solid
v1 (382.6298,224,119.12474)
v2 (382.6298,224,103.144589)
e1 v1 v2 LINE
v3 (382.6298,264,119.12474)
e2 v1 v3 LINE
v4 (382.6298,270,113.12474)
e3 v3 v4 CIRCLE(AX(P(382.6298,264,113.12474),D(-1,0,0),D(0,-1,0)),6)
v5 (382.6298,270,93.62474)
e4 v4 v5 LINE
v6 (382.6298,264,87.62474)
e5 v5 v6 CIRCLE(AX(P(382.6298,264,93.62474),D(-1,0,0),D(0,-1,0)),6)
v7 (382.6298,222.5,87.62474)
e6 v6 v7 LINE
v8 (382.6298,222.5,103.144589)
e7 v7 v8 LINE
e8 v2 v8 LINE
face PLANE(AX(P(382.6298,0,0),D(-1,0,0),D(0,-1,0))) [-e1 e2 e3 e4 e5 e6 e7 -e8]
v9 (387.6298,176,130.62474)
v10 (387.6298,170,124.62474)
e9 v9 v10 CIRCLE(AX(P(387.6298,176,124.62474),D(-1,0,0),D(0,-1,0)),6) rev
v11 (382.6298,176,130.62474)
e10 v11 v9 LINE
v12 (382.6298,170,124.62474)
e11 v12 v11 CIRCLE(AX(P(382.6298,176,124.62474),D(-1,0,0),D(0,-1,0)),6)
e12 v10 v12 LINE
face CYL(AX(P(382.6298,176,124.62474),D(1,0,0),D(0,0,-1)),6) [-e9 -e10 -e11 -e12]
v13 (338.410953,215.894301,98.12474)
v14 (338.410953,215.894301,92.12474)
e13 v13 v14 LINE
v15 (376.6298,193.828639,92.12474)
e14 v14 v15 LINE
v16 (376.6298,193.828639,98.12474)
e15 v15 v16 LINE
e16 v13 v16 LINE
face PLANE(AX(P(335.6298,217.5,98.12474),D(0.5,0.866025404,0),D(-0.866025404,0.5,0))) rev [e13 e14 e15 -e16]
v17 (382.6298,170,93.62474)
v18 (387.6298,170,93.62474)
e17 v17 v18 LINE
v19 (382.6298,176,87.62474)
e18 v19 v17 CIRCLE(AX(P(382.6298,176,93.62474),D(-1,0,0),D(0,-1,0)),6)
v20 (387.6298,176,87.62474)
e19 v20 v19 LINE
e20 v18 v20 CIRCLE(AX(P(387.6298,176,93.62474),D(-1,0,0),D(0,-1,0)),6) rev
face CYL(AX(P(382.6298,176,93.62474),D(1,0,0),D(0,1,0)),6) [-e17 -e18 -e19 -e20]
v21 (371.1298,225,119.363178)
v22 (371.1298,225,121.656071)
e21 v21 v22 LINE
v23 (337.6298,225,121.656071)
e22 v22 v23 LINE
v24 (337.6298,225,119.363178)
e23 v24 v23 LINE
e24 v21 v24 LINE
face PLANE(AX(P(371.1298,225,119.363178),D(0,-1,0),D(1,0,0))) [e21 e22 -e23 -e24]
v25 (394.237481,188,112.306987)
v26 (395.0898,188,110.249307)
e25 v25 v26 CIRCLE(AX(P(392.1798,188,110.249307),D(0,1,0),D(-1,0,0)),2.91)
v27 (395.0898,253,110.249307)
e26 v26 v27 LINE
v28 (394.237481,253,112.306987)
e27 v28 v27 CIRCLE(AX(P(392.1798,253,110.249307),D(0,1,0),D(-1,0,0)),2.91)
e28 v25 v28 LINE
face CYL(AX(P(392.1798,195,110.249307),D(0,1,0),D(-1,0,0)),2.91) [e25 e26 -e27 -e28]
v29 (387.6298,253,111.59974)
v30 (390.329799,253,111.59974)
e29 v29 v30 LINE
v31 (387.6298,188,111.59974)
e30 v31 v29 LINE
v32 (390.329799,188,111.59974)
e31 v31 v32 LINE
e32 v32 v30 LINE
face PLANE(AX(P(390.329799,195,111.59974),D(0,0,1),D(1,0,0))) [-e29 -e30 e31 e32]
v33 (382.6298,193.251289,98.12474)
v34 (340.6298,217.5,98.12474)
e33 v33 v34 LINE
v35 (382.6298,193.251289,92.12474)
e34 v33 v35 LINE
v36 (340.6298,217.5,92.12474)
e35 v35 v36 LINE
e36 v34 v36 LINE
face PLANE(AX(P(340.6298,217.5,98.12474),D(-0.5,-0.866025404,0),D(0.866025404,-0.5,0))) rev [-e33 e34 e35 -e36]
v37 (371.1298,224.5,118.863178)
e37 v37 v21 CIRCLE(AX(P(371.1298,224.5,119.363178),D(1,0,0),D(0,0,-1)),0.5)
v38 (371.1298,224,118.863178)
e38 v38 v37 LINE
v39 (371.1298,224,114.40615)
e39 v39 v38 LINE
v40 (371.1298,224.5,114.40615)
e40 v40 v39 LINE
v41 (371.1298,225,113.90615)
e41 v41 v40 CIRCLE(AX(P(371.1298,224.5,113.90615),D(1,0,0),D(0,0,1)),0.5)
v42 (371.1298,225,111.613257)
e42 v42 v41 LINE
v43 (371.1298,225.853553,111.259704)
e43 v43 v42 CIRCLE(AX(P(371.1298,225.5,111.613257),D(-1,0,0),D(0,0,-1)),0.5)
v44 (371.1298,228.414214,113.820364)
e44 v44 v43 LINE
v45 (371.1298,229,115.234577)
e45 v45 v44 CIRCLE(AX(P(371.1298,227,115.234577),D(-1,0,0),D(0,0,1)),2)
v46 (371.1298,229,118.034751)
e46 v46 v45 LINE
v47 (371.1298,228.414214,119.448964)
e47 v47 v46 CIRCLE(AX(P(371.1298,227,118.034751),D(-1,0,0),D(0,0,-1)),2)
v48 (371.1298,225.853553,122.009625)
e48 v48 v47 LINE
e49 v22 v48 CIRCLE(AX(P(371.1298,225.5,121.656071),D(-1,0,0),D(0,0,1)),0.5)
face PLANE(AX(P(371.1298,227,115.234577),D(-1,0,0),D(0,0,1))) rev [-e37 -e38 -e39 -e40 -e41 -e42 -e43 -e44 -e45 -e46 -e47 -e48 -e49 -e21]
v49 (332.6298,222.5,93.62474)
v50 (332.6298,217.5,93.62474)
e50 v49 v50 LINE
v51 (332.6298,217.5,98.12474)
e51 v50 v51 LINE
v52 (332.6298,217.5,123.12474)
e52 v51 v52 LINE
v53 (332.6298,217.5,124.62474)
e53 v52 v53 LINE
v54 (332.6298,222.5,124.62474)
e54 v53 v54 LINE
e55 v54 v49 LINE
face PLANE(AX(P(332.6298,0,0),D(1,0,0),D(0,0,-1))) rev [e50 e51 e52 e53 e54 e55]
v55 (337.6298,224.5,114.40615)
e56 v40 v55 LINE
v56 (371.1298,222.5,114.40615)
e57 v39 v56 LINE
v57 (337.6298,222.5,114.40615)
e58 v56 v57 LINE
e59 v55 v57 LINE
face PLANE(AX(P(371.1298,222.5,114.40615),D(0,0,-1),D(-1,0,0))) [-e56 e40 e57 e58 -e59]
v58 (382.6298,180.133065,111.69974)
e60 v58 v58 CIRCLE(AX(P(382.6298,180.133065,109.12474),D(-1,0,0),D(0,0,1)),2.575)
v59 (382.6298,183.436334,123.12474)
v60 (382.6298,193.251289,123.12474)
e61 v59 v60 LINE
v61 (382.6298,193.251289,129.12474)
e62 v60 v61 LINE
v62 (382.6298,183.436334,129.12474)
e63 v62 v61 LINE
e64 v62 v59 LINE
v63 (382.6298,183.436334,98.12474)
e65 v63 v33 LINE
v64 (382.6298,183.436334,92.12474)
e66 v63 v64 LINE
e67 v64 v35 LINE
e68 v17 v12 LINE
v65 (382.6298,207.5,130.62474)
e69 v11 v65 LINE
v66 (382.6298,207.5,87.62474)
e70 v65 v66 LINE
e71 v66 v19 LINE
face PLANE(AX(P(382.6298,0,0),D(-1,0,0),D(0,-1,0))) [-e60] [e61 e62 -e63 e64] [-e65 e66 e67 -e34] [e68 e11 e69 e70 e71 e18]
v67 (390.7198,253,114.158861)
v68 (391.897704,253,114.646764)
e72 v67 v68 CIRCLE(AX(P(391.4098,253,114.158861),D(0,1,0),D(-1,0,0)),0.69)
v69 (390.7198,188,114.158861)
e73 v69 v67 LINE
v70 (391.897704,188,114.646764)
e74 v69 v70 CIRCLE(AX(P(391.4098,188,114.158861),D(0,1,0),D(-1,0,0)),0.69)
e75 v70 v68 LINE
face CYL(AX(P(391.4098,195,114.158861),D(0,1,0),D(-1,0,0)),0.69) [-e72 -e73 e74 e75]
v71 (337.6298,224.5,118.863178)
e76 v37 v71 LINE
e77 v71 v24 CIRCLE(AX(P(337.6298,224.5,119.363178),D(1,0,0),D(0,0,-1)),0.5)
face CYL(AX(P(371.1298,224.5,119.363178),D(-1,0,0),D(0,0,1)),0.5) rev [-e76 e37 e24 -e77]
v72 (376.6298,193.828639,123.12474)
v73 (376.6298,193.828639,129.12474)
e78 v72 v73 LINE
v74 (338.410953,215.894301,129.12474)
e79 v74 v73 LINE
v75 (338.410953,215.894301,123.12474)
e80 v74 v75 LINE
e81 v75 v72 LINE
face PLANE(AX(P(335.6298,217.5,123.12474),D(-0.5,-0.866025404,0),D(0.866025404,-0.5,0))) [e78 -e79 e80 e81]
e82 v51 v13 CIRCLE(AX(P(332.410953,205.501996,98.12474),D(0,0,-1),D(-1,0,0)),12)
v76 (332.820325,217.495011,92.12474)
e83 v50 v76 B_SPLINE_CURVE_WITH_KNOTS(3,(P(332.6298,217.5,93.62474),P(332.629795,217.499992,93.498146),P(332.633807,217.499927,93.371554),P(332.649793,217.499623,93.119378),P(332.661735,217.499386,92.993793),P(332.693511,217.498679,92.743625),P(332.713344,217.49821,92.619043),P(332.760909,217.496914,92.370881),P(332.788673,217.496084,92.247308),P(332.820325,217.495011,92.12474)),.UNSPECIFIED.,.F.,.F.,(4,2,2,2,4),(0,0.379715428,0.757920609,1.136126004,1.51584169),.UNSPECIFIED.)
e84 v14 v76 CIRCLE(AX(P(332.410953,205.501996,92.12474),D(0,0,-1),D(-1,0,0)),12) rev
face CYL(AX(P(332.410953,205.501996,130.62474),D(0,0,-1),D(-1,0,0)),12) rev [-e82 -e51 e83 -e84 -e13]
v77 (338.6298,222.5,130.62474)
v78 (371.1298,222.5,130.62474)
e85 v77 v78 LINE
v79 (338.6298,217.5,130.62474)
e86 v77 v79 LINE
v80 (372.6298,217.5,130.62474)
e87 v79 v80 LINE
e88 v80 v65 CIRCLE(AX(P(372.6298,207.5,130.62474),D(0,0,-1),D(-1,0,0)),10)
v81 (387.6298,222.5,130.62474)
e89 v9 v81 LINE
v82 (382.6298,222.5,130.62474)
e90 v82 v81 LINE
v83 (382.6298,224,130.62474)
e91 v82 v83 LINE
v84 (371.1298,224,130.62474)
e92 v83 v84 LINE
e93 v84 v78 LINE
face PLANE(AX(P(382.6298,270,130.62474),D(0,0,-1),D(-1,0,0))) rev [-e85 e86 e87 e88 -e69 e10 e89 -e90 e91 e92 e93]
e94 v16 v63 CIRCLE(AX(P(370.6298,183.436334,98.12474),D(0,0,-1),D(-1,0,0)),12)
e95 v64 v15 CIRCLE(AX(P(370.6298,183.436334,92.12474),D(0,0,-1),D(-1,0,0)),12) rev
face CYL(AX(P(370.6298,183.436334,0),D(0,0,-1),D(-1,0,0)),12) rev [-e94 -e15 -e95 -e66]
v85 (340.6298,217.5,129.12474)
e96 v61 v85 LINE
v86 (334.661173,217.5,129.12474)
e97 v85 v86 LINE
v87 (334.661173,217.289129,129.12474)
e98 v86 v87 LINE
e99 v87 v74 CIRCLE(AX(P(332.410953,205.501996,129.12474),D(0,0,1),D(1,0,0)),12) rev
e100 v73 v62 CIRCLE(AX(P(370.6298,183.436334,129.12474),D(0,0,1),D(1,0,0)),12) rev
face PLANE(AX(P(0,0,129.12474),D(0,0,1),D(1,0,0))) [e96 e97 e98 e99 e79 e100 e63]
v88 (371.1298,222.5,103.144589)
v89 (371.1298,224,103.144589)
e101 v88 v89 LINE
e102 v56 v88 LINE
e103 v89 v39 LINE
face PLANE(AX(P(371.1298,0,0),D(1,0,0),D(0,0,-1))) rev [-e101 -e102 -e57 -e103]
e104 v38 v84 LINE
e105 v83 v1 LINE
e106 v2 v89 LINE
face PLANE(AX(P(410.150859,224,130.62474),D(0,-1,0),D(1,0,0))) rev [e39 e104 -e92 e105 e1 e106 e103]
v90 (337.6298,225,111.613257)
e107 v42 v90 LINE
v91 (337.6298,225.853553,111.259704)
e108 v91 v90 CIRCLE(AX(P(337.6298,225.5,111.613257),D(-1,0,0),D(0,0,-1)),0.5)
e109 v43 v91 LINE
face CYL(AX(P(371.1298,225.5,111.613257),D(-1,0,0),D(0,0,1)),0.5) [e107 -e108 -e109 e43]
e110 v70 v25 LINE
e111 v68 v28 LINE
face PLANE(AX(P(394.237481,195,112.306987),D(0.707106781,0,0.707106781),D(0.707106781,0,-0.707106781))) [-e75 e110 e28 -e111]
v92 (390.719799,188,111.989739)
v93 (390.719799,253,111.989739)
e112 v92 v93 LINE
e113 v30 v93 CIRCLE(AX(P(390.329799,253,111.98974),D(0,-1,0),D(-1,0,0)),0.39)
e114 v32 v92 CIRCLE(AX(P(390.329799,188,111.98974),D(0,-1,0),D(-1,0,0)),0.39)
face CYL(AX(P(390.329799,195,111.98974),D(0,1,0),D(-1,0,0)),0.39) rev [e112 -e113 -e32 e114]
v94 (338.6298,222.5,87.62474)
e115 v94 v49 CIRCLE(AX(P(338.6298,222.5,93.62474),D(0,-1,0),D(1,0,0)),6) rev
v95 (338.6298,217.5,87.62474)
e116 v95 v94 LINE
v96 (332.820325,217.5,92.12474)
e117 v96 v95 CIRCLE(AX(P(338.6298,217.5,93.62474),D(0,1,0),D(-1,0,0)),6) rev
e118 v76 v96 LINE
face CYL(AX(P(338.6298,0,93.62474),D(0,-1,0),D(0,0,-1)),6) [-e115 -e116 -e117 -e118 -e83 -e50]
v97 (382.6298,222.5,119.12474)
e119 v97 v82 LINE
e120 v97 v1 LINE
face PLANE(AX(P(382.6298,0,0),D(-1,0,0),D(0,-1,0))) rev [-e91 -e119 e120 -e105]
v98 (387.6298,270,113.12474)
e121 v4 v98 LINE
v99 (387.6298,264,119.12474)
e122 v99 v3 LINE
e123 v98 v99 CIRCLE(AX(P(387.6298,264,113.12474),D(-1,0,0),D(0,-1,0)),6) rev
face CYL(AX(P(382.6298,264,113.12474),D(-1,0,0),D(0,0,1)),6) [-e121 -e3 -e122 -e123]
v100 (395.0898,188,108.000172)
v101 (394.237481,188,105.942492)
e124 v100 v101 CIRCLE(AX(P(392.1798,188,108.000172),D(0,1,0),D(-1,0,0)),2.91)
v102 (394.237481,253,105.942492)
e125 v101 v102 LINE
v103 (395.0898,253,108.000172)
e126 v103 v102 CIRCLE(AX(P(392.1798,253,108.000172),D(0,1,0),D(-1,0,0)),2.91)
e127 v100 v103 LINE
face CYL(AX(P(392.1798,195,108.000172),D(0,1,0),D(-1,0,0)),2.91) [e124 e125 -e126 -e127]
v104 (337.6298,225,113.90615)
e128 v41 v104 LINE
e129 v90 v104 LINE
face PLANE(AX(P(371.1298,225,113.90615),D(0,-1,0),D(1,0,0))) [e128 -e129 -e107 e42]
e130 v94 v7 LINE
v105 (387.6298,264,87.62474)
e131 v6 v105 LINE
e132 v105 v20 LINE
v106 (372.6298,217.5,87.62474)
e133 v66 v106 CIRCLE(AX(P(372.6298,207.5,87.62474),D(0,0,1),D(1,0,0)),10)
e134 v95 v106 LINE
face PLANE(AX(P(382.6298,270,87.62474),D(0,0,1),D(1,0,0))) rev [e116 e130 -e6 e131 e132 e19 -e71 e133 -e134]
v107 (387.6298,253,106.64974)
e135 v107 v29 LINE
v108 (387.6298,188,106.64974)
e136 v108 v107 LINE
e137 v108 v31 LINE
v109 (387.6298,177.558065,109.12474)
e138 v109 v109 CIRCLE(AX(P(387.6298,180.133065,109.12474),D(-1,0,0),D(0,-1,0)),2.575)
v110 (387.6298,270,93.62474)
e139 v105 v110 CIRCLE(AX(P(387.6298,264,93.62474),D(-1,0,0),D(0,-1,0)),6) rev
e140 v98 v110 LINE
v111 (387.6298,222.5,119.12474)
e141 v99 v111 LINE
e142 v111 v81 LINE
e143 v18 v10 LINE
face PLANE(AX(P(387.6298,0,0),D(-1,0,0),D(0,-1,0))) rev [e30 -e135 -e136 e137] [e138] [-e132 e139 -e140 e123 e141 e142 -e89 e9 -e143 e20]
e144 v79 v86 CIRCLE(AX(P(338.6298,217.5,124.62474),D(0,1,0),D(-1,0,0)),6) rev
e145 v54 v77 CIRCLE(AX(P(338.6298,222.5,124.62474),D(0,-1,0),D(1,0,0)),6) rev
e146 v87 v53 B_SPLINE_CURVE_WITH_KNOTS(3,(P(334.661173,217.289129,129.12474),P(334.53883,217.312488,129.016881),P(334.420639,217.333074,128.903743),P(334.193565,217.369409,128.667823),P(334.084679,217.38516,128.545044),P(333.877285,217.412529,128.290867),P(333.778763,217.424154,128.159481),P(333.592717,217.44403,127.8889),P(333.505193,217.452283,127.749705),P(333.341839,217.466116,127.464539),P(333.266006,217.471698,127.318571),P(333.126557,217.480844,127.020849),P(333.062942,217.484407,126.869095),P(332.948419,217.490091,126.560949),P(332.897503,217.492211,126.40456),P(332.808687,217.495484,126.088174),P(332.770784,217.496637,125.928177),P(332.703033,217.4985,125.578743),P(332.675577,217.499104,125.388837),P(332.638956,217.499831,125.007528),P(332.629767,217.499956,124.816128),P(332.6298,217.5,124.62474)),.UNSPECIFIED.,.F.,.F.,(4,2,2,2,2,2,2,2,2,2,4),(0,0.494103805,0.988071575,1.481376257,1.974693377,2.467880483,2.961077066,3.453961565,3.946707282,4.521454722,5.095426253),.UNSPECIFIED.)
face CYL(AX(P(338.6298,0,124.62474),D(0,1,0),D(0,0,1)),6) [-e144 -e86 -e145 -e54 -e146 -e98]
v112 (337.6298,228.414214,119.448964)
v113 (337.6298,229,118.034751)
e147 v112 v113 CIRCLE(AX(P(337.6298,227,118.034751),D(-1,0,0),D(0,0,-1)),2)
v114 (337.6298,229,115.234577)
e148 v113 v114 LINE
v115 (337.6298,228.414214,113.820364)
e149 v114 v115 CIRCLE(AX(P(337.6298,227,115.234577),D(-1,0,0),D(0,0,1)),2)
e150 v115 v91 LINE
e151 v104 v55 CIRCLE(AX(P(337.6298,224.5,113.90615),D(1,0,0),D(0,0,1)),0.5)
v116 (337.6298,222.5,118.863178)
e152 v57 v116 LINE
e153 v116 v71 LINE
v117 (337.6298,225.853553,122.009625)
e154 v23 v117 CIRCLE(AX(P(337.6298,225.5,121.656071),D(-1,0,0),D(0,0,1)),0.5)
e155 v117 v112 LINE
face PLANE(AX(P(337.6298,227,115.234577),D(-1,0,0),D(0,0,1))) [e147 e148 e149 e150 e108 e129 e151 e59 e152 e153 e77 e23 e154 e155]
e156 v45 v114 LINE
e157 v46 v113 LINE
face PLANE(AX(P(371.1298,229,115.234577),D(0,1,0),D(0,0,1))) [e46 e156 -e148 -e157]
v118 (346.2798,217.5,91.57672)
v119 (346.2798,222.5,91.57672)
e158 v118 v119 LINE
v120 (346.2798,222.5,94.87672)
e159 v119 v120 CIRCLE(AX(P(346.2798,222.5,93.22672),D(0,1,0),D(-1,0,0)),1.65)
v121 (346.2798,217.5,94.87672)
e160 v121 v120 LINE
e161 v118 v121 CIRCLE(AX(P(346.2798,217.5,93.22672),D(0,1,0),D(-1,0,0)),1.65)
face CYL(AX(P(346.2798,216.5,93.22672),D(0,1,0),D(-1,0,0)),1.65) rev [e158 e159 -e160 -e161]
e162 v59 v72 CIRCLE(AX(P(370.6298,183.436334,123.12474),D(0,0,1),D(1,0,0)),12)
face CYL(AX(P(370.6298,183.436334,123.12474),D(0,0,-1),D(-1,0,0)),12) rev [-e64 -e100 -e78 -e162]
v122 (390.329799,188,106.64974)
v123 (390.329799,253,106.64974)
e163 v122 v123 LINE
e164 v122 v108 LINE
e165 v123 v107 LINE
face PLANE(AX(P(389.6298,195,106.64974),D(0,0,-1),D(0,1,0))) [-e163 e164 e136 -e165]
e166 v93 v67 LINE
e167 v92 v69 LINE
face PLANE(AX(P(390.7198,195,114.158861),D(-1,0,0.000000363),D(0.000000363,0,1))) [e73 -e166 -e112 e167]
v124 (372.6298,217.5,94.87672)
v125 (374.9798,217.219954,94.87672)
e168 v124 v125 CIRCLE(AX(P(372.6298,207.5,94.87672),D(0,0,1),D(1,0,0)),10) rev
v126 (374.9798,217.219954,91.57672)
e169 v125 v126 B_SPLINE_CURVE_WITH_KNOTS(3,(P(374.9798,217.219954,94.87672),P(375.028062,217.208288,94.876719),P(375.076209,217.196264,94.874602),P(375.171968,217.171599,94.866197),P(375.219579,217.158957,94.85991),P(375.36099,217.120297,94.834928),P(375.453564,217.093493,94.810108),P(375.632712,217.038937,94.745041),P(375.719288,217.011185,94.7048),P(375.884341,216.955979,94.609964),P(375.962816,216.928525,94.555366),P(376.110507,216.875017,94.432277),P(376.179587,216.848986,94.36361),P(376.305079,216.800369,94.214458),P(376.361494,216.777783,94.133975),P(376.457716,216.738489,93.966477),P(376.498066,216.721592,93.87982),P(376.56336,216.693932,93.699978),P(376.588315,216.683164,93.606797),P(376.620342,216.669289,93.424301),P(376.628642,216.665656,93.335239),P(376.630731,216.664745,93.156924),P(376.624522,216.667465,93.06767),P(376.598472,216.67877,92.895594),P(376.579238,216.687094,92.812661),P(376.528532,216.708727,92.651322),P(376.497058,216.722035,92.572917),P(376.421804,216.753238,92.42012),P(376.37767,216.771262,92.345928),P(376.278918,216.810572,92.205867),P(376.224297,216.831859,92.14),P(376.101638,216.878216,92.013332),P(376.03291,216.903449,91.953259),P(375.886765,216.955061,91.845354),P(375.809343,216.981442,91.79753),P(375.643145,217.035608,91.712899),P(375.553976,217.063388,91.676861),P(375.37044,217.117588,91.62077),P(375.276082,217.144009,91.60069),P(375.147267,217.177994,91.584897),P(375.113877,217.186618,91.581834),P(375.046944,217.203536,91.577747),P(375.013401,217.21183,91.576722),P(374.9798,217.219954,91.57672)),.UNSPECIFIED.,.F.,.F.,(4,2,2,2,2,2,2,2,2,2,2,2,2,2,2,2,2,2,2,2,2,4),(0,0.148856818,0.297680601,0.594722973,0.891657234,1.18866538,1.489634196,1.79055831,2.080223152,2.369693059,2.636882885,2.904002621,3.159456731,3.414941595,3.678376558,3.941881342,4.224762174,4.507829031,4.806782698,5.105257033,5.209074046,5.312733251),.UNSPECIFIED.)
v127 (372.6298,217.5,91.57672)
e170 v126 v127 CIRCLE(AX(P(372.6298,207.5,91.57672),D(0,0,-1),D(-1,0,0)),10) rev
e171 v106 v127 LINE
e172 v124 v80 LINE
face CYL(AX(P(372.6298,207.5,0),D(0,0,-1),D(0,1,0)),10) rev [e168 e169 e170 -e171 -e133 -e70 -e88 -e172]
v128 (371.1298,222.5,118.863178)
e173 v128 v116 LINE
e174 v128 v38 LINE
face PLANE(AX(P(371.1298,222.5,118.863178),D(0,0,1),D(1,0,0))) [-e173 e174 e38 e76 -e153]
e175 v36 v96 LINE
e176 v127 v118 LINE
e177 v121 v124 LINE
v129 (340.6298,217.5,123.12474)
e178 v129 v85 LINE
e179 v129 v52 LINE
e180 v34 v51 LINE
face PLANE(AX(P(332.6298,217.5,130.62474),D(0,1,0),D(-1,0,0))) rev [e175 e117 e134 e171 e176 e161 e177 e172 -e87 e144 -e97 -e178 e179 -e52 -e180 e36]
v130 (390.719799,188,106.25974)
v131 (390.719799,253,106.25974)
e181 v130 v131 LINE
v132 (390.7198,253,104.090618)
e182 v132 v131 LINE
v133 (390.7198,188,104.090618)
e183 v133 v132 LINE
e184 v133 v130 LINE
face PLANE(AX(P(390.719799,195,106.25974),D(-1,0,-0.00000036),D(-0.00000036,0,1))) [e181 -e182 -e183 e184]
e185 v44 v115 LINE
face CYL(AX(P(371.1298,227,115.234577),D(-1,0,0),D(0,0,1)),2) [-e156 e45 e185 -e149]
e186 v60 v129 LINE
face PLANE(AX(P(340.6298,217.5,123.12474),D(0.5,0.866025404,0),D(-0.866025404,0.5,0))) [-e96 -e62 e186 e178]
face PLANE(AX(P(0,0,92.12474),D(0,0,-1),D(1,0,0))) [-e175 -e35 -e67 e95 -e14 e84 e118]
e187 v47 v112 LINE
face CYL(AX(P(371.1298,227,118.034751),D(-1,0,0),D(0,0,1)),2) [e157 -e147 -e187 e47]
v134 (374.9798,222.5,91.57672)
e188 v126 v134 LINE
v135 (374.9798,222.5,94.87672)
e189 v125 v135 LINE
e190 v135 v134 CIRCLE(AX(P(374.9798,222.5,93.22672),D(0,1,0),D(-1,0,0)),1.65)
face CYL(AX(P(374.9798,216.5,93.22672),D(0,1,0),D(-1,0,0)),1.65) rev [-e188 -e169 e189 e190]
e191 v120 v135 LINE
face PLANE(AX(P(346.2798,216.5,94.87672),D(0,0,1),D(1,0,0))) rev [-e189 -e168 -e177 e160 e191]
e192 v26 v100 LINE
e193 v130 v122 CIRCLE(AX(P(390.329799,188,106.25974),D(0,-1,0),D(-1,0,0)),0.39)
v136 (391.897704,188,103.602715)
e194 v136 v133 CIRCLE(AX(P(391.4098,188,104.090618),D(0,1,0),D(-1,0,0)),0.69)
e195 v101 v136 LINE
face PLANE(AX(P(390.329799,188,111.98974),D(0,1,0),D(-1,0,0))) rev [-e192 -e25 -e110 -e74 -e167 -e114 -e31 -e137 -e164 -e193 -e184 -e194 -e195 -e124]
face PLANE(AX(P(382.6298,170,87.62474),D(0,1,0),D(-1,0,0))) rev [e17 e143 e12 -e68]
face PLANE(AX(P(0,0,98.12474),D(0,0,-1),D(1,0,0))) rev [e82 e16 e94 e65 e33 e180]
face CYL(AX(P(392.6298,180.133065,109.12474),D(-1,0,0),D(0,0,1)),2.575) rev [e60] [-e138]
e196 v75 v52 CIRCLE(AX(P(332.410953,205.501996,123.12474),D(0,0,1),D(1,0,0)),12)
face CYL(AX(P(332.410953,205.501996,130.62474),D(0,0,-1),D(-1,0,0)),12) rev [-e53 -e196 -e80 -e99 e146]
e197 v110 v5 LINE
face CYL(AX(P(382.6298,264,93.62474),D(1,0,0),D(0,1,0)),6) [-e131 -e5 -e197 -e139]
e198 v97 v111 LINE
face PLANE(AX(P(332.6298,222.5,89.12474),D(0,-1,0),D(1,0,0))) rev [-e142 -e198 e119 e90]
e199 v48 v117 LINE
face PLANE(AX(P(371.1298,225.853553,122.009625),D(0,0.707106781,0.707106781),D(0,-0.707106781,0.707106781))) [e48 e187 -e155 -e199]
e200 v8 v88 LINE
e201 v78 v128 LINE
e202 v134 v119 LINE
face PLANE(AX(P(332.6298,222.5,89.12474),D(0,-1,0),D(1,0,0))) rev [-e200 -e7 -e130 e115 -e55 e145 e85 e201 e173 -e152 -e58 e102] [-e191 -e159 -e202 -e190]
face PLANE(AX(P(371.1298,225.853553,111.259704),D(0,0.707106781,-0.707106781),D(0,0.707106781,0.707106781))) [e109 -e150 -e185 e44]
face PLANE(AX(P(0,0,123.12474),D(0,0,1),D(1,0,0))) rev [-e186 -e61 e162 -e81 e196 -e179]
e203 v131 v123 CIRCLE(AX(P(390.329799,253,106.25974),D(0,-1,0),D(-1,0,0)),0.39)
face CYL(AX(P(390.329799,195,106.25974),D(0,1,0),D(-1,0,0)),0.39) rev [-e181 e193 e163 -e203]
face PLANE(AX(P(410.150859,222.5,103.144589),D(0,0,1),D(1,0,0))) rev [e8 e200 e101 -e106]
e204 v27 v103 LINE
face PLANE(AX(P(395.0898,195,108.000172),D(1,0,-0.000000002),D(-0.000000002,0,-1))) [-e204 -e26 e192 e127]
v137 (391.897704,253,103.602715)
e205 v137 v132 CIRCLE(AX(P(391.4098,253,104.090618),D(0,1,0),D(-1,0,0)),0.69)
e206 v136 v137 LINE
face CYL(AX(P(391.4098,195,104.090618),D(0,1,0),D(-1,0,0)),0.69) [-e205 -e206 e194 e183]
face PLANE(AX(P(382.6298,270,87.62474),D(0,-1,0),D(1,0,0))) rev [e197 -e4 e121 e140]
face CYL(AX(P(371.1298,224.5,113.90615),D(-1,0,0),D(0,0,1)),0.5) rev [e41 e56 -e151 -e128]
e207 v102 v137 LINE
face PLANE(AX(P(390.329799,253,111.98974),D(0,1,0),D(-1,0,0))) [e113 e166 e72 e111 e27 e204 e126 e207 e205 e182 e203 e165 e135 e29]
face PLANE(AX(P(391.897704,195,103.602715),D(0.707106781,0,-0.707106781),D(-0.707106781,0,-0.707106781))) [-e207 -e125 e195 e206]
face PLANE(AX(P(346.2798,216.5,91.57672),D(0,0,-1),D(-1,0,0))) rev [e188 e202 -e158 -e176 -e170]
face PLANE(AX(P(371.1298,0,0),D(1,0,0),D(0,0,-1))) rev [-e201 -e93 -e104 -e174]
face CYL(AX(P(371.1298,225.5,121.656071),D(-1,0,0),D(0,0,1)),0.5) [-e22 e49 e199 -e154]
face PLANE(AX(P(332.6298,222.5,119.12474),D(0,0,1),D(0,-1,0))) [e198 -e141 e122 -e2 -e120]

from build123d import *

# Parameters (mm, degrees)
BOSS_EXTRUDE5_DEPTH  = 50
SKETCH11_W           = 43
SKETCH11_H           = 100
BOSS_EXTRUDE6_DEPTH  = 5
BOSS_EXTRUDE8_DEPTH  = 55
SKETCH13_W           = 11.5
SKETCH13_H           = 47.5
CUT_EXTRUDE1_DEPTH   = 55
BOSS_EXTRUDE9_DEPTH  = 6
FILLET7_R            = 12
FILLET7_OF_MIRROR1_R = 12
FILLET8_R            = 6
BOSS_EXTRUDE10_START = 8
BOSS_EXTRUDE10_DEPTH = 8
FILLET12_R           = 10
BOSS_EXTRUDE11_DEPTH = 57
SKETCH16_R           = 2.575
CUT_EXTRUDE2_DEPTH   = 10
SKETCH17_W           = 27.480150942
SKETCH17_H           = 1.5
BOSS_EXTRUDE12_DEPTH = 11.5
BOSS_EXTRUDE15_START = -5
BOSS_EXTRUDE15_DEPTH = 33.5
CUT_EXTRUDE3_DEPTH   = 6


with BuildPart() as part:
    # Sketch9 → Boss-Extrude5 (new body)
    with BuildSketch(Plane(origin=(0, 245, 0), x_dir=(1, 0, 0), z_dir=(0, 1, 0))):
        with BuildLine():
            Line((389.629800237, -111.599739584), (387.629800237, -111.599739584))
            Line((387.629800237, -111.599739584), (387.629800237, -106.649739584))
            Line((387.629800237, -106.649739584), (389.629800237, -106.649739584))
            Line((389.629800237, -106.649739584), (390.329799474, -106.649739584))
            ThreePointArc((390.329799474, -106.649739584), (390.605571069, -106.535511279), (390.719799474, -106.259739725))
            Line((390.719799474, -106.259739725), (390.719800256, -104.090618139))
            ThreePointArc((390.719800256, -104.090618139), (391.145748802, -103.453141463), (391.897703935, -103.602714709))
            Line((391.897703935, -103.602714709), (394.237480965, -105.942491739))
            ThreePointArc((394.237480965, -105.942491739), (394.868289671, -106.886563682), (395.089800232, -108.000172467))
            Line((395.089800232, -108.000172467), (395.089800237, -110.249306685))
            ThreePointArc((395.089800237, -110.249306685), (394.868289678, -111.362915477), (394.23748097, -112.306987424))
            Line((394.23748097, -112.306987424), (391.897703941, -114.646764454))
            ThreePointArc((391.897703941, -114.646764454), (391.145748809, -114.7963377), (390.719800262, -114.158861025))
            Line((390.719800262, -114.158861025), (390.719799474, -111.989739443))
            ThreePointArc((390.719799474, -111.989739443), (390.605571069, -111.71396789), (390.329799474, -111.599739584))
            Line((390.329799474, -111.599739584), (389.629800237, -111.599739584))
        make_face()
    extrude(amount=-BOSS_EXTRUDE5_DEPTH)

    # Sketch11 → Boss-Extrude6 (add)
    with BuildSketch(Plane.ZY.offset(-387.629800242)):
        with Locations((109.124739584, 220)):
            Rectangle(SKETCH11_W, SKETCH11_H)
    extrude(amount=BOSS_EXTRUDE6_DEPTH)

    # Sketch12 → Boss-Extrude8 (add)
    with BuildSketch(Plane.ZY.offset(-387.629800242)):
        Polygon((130.624739584, 222.5), (89.124739584, 222.5), (87.624739584, 222.5), (87.624739584, 217.5), (89.124739584, 217.5), (130.624739584, 217.5), align=None)
    extrude(amount=BOSS_EXTRUDE8_DEPTH)

    # Sketch13 → Cut-Extrude1 (cut)
    with BuildSketch(Plane.ZY.offset(-387.629800242)):
        with Locations((124.874739584, 246.25)):
            Rectangle(SKETCH13_W, SKETCH13_H)
    extrude(amount=CUT_EXTRUDE1_DEPTH, mode=Mode.SUBTRACT)

    # Sketch15 → Boss-Extrude9 (add)
    with BuildSketch(Plane.XY.offset(129.124739584)):
        Polygon((335.629800242, 217.5), (382.629800242, 190.364537348), (382.629800242, 193.251288694), (340.629800242, 217.5), align=None)
    boss_extrude9 = extrude(amount=-BOSS_EXTRUDE9_DEPTH)

    # Fillet7
    # the kernel refuses this fillet: 12 mm, written as the material it adds along each edge
    with BuildSketch(Plane(origin=(335.629800242, 217.5, 129.124739584), x_dir=(-1, 0, 0), z_dir=(0, 0, -1))) as fillet7_piece_1:
        with BuildLine():
            CenterArc((3.218847051, -11.998004249), FILLET7_R, 91.044975628, 28.955024372)
            Line((-2.781152949, -1.605699404), (-2.901152949, -1.397853307))
            Line((-2.901152949, -1.397853307), (-0.12, 0.207846097))
            Line((-0.12, 0.207846097), (0, 0.24))
            ThreePointArc((0, 0.24), (1.5, 0.24), (2.995623059, 0.239960085))
            Line((2.995623059, 0.239960085), (3, 0))
        make_face()
    extrude(amount=6)
    with BuildSketch(Plane(origin=(382.629800242, 190.364537348, 129.124739584), x_dir=(0, -1, 0), z_dir=(0, 0, -1))) as fillet7_piece_2:
        with BuildLine():
            CenterArc((FILLET7_R * 0.57735026919, FILLET7_R), FILLET7_R, 210, 60)
            Line((-FILLET7_R * 0.288675134595, FILLET7_R * 0.5), (-FILLET7_R * 0.305995642671, FILLET7_R * 0.49))
            Line((-FILLET7_R * 0.305995642671, FILLET7_R * 0.49), (-FILLET7_R * 0.0115470053838, -FILLET7_R * 0.02))
            Line((-FILLET7_R * 0.0115470053838, -FILLET7_R * 0.02), (FILLET7_R * 0.57735026919, -FILLET7_R * 0.02))
            Line((FILLET7_R * 0.57735026919, -FILLET7_R * 0.02), (FILLET7_R * 0.57735026919, 0))
        make_face()
    extrude(amount=6)

    # Mirror1: Boss-Extrude9 across plane
    add(boss_extrude9.mirror(Plane.XY.offset(110.624739584)))

    # Fillet7 of Mirror1
    # the kernel refuses this fillet: 12 mm, written as the material it adds along each edge
    with BuildSketch(Plane(origin=(335.629800242, 217.5, 92.124739584), x_dir=(-1, 0, 0), z_dir=(0, 0, 1))) as fillet7_of_mirror1_piece_1:
        with BuildLine():
            CenterArc((3.218847051, 11.998004249), FILLET7_OF_MIRROR1_R, 240, 28.955024372)
            Line((-2.781152949, 1.605699404), (-2.901152949, 1.397853307))
            Line((-2.901152949, 1.397853307), (-0.12, -0.207846097))
            Line((-0.12, -0.207846097), (0, -0.24))
            ThreePointArc((0, -0.24), (1.5, -0.24), (2.995623059, -0.239960085))
            Line((2.995623059, -0.239960085), (3, 0))
        make_face()
    extrude(amount=6)
    with BuildSketch(Plane(origin=(382.629800242, 190.364537348, 92.124739584), x_dir=(0, -1, 0), z_dir=(0, 0, 1))) as fillet7_of_mirror1_piece_2:
        with BuildLine():
            CenterArc((FILLET7_OF_MIRROR1_R * 0.57735026919, -FILLET7_OF_MIRROR1_R), FILLET7_OF_MIRROR1_R, 90, 60)
            Line((-FILLET7_OF_MIRROR1_R * 0.288675134595, -FILLET7_OF_MIRROR1_R * 0.5), (-FILLET7_OF_MIRROR1_R * 0.305995642671, -FILLET7_OF_MIRROR1_R * 0.49))
            Line((-FILLET7_OF_MIRROR1_R * 0.305995642671, -FILLET7_OF_MIRROR1_R * 0.49), (-FILLET7_OF_MIRROR1_R * 0.0115470053838, FILLET7_OF_MIRROR1_R * 0.02))
            Line((-FILLET7_OF_MIRROR1_R * 0.0115470053838, FILLET7_OF_MIRROR1_R * 0.02), (FILLET7_OF_MIRROR1_R * 0.57735026919, FILLET7_OF_MIRROR1_R * 0.02))
            Line((FILLET7_OF_MIRROR1_R * 0.57735026919, FILLET7_OF_MIRROR1_R * 0.02), (FILLET7_OF_MIRROR1_R * 0.57735026919, 0))
        make_face()
    extrude(amount=6)

    # Fillet8
    # the kernel refuses this fillet: 6 mm, written as the material it takes off along each edge
    with BuildSketch(Plane(origin=(402.629800242, 270, 87.624739584), x_dir=(0, 0, 1), z_dir=(-1, 0, 0)), Plane(origin=(332.629800242, 237.5, 87.624739584), x_dir=(0, 0, 1), z_dir=(0, -1, 0)), Plane(origin=(402.629800242, 270, 119.124739584), x_dir=(0, -1, 0), z_dir=(-1, 0, 0))) as fillet8_piece_1:
        with BuildLine():
            CenterArc((FILLET8_R, -FILLET8_R), FILLET8_R, 90, 90)
            Line((0, -FILLET8_R), (0, 0))
            Line((0, 0), (FILLET8_R, 0))
        make_face()
    extrude(amount=35, mode=Mode.SUBTRACT)
    with BuildSketch(Plane(origin=(402.629800242, 170, 87.624739584), x_dir=(0, 0, 1), z_dir=(-1, 0, 0)), Plane(origin=(402.629800242, 170, 130.624739584), x_dir=(0, 1, 0), z_dir=(-1, 0, 0)), Plane(origin=(332.629800242, 202.5, 130.624739584), x_dir=(1, 0, 0), z_dir=(0, 1, 0))) as fillet8_piece_2:
        with BuildLine():
            CenterArc((FILLET8_R, FILLET8_R), FILLET8_R, 180, 90)
            Line((0, FILLET8_R), (0, 0))
            Line((0, 0), (FILLET8_R, 0))
        make_face()
    extrude(amount=35, mode=Mode.SUBTRACT)

    # Sketch9<2> → Boss-Extrude10 (add)
    with BuildSketch(Plane(origin=(0, 245, 0), x_dir=(1, 0, 0), z_dir=(0, 1, 0)).offset(BOSS_EXTRUDE10_START)):
        with BuildLine():
            Line((389.629800237, -111.599739584), (387.629800237, -111.599739584))
            Line((387.629800237, -111.599739584), (387.629800237, -106.649739584))
            Line((387.629800237, -106.649739584), (389.629800237, -106.649739584))
            Line((389.629800237, -106.649739584), (390.329799474, -106.649739584))
            ThreePointArc((390.329799474, -106.649739584), (390.605571069, -106.535511279), (390.719799474, -106.259739725))
            Line((390.719799474, -106.259739725), (390.719800256, -104.090618139))
            ThreePointArc((390.719800256, -104.090618139), (391.145748802, -103.453141463), (391.897703935, -103.602714709))
            Line((391.897703935, -103.602714709), (394.237480965, -105.942491739))
            ThreePointArc((394.237480965, -105.942491739), (394.868289671, -106.886563682), (395.089800232, -108.000172467))
            Line((395.089800232, -108.000172467), (395.089800237, -110.249306685))
            ThreePointArc((395.089800237, -110.249306685), (394.868289678, -111.362915477), (394.23748097, -112.306987424))
            Line((394.23748097, -112.306987424), (391.897703941, -114.646764454))
            ThreePointArc((391.897703941, -114.646764454), (391.145748809, -114.7963377), (390.719800262, -114.158861025))
            Line((390.719800262, -114.158861025), (390.719799474, -111.989739443))
            ThreePointArc((390.719799474, -111.989739443), (390.605571069, -111.71396789), (390.329799474, -111.599739584))
            Line((390.329799474, -111.599739584), (389.629800237, -111.599739584))
        make_face()
    extrude(amount=-BOSS_EXTRUDE10_DEPTH)

    # Fillet12
    fillet12_edges = [part.edges().sort_by_distance(p)[0] for p in [
        (382.629800242, 217.5, 109.124739584),
    ]]
    fillet(fillet12_edges, radius=FILLET12_R)

    # Sketch9<3> → Boss-Extrude11 (add)
    with BuildSketch(Plane(origin=(0, 245, 0), x_dir=(1, 0, 0), z_dir=(0, 1, 0))):
        with BuildLine():
            Line((389.629800237, -111.599739584), (387.629800237, -111.599739584))
            Line((387.629800237, -111.599739584), (387.629800237, -106.649739584))
            Line((387.629800237, -106.649739584), (389.629800237, -106.649739584))
            Line((389.629800237, -106.649739584), (390.329799474, -106.649739584))
            ThreePointArc((390.329799474, -106.649739584), (390.605571069, -106.535511279), (390.719799474, -106.259739725))
            Line((390.719799474, -106.259739725), (390.719800256, -104.090618139))
            ThreePointArc((390.719800256, -104.090618139), (391.145748802, -103.453141463), (391.897703935, -103.602714709))
            Line((391.897703935, -103.602714709), (394.237480965, -105.942491739))
            ThreePointArc((394.237480965, -105.942491739), (394.868289671, -106.886563682), (395.089800232, -108.000172467))
            Line((395.089800232, -108.000172467), (395.089800237, -110.249306685))
            ThreePointArc((395.089800237, -110.249306685), (394.868289678, -111.362915477), (394.23748097, -112.306987424))
            Line((394.23748097, -112.306987424), (391.897703941, -114.646764454))
            ThreePointArc((391.897703941, -114.646764454), (391.145748809, -114.7963377), (390.719800262, -114.158861025))
            Line((390.719800262, -114.158861025), (390.719799474, -111.989739443))
            ThreePointArc((390.719799474, -111.989739443), (390.605571069, -111.71396789), (390.329799474, -111.599739584))
            Line((390.329799474, -111.599739584), (389.629800237, -111.599739584))
        make_face()
    extrude(amount=-BOSS_EXTRUDE11_DEPTH)

    # Sketch16 → Cut-Extrude2 (cut)
    with BuildSketch(Plane.ZY.offset(-382.629800242)):
        with Locations((109.124739584, 180.133064736)):
            Circle(SKETCH16_R)
    extrude(amount=-CUT_EXTRUDE2_DEPTH, mode=Mode.SUBTRACT)

    # Sketch17 → Boss-Extrude12 (add)
    with BuildSketch(Plane(origin=(371.129800242, 0, 0), x_dir=(0, 0, -1), z_dir=(1, 0, 0))):
        with Locations((-116.884664113, 223.25)):
            Rectangle(SKETCH17_W, SKETCH17_H)
    extrude(amount=BOSS_EXTRUDE12_DEPTH)

    # Sketch22 → Boss-Extrude15 (add)
    with BuildSketch(Plane.ZY.offset(-332.629800242).offset(BOSS_EXTRUDE15_START)):
        with BuildLine():
            Line((114.406150208, 222.5), (114.406150208, 224.5))
            ThreePointArc((114.406150208, 224.5), (114.259703598, 224.853553391), (113.906150208, 225))
            Line((113.906150208, 225), (111.613256989, 225))
            ThreePointArc((111.613256989, 225), (111.151317223, 225.308658284), (111.259703598, 225.853553391))
            Line((111.259703598, 225.853553391), (113.82036377, 228.414213562))
            ThreePointArc((113.82036377, 228.414213562), (114.469210468, 228.847759065), (115.234577333, 229))
            Line((115.234577333, 229), (116.634664113, 229))
            Line((116.634664113, 229), (118.034750894, 229))
            ThreePointArc((118.034750894, 229), (118.800117758, 228.847759065), (119.448964456, 228.414213562))
            Line((119.448964456, 228.414213562), (122.009624628, 225.853553391))
            ThreePointArc((122.009624628, 225.853553391), (122.118011003, 225.308658284), (121.656071237, 225))
            Line((121.656071237, 225), (119.363178018, 225))
            ThreePointArc((119.363178018, 225), (119.009624628, 224.853553391), (118.863178018, 224.5))
            Line((118.863178018, 224.5), (118.863178018, 222.5))
            Line((118.863178018, 222.5), (114.406150208, 222.5))
        make_face()
    extrude(amount=-BOSS_EXTRUDE15_DEPTH)

    # Sketch23 → Cut-Extrude3 (cut)
    with BuildSketch(Plane(origin=(0, 222.5, 0), x_dir=(1, 0, 0), z_dir=(0, 1, 0))):
        with BuildLine():
            Line((346.279800242, -91.576720164), (374.979800242, -91.576720164))
            ThreePointArc((374.979800242, -91.576720164), (376.629800242, -93.226720164), (374.979800242, -94.876720164))
            Line((374.979800242, -94.876720164), (346.279800242, -94.876720164))
            ThreePointArc((346.279800242, -94.876720164), (344.629800242, -93.226720164), (346.279800242, -91.576720164))
        make_face()
    extrude(amount=-CUT_EXTRUDE3_DEPTH, mode=Mode.SUBTRACT)


solid = part.part
